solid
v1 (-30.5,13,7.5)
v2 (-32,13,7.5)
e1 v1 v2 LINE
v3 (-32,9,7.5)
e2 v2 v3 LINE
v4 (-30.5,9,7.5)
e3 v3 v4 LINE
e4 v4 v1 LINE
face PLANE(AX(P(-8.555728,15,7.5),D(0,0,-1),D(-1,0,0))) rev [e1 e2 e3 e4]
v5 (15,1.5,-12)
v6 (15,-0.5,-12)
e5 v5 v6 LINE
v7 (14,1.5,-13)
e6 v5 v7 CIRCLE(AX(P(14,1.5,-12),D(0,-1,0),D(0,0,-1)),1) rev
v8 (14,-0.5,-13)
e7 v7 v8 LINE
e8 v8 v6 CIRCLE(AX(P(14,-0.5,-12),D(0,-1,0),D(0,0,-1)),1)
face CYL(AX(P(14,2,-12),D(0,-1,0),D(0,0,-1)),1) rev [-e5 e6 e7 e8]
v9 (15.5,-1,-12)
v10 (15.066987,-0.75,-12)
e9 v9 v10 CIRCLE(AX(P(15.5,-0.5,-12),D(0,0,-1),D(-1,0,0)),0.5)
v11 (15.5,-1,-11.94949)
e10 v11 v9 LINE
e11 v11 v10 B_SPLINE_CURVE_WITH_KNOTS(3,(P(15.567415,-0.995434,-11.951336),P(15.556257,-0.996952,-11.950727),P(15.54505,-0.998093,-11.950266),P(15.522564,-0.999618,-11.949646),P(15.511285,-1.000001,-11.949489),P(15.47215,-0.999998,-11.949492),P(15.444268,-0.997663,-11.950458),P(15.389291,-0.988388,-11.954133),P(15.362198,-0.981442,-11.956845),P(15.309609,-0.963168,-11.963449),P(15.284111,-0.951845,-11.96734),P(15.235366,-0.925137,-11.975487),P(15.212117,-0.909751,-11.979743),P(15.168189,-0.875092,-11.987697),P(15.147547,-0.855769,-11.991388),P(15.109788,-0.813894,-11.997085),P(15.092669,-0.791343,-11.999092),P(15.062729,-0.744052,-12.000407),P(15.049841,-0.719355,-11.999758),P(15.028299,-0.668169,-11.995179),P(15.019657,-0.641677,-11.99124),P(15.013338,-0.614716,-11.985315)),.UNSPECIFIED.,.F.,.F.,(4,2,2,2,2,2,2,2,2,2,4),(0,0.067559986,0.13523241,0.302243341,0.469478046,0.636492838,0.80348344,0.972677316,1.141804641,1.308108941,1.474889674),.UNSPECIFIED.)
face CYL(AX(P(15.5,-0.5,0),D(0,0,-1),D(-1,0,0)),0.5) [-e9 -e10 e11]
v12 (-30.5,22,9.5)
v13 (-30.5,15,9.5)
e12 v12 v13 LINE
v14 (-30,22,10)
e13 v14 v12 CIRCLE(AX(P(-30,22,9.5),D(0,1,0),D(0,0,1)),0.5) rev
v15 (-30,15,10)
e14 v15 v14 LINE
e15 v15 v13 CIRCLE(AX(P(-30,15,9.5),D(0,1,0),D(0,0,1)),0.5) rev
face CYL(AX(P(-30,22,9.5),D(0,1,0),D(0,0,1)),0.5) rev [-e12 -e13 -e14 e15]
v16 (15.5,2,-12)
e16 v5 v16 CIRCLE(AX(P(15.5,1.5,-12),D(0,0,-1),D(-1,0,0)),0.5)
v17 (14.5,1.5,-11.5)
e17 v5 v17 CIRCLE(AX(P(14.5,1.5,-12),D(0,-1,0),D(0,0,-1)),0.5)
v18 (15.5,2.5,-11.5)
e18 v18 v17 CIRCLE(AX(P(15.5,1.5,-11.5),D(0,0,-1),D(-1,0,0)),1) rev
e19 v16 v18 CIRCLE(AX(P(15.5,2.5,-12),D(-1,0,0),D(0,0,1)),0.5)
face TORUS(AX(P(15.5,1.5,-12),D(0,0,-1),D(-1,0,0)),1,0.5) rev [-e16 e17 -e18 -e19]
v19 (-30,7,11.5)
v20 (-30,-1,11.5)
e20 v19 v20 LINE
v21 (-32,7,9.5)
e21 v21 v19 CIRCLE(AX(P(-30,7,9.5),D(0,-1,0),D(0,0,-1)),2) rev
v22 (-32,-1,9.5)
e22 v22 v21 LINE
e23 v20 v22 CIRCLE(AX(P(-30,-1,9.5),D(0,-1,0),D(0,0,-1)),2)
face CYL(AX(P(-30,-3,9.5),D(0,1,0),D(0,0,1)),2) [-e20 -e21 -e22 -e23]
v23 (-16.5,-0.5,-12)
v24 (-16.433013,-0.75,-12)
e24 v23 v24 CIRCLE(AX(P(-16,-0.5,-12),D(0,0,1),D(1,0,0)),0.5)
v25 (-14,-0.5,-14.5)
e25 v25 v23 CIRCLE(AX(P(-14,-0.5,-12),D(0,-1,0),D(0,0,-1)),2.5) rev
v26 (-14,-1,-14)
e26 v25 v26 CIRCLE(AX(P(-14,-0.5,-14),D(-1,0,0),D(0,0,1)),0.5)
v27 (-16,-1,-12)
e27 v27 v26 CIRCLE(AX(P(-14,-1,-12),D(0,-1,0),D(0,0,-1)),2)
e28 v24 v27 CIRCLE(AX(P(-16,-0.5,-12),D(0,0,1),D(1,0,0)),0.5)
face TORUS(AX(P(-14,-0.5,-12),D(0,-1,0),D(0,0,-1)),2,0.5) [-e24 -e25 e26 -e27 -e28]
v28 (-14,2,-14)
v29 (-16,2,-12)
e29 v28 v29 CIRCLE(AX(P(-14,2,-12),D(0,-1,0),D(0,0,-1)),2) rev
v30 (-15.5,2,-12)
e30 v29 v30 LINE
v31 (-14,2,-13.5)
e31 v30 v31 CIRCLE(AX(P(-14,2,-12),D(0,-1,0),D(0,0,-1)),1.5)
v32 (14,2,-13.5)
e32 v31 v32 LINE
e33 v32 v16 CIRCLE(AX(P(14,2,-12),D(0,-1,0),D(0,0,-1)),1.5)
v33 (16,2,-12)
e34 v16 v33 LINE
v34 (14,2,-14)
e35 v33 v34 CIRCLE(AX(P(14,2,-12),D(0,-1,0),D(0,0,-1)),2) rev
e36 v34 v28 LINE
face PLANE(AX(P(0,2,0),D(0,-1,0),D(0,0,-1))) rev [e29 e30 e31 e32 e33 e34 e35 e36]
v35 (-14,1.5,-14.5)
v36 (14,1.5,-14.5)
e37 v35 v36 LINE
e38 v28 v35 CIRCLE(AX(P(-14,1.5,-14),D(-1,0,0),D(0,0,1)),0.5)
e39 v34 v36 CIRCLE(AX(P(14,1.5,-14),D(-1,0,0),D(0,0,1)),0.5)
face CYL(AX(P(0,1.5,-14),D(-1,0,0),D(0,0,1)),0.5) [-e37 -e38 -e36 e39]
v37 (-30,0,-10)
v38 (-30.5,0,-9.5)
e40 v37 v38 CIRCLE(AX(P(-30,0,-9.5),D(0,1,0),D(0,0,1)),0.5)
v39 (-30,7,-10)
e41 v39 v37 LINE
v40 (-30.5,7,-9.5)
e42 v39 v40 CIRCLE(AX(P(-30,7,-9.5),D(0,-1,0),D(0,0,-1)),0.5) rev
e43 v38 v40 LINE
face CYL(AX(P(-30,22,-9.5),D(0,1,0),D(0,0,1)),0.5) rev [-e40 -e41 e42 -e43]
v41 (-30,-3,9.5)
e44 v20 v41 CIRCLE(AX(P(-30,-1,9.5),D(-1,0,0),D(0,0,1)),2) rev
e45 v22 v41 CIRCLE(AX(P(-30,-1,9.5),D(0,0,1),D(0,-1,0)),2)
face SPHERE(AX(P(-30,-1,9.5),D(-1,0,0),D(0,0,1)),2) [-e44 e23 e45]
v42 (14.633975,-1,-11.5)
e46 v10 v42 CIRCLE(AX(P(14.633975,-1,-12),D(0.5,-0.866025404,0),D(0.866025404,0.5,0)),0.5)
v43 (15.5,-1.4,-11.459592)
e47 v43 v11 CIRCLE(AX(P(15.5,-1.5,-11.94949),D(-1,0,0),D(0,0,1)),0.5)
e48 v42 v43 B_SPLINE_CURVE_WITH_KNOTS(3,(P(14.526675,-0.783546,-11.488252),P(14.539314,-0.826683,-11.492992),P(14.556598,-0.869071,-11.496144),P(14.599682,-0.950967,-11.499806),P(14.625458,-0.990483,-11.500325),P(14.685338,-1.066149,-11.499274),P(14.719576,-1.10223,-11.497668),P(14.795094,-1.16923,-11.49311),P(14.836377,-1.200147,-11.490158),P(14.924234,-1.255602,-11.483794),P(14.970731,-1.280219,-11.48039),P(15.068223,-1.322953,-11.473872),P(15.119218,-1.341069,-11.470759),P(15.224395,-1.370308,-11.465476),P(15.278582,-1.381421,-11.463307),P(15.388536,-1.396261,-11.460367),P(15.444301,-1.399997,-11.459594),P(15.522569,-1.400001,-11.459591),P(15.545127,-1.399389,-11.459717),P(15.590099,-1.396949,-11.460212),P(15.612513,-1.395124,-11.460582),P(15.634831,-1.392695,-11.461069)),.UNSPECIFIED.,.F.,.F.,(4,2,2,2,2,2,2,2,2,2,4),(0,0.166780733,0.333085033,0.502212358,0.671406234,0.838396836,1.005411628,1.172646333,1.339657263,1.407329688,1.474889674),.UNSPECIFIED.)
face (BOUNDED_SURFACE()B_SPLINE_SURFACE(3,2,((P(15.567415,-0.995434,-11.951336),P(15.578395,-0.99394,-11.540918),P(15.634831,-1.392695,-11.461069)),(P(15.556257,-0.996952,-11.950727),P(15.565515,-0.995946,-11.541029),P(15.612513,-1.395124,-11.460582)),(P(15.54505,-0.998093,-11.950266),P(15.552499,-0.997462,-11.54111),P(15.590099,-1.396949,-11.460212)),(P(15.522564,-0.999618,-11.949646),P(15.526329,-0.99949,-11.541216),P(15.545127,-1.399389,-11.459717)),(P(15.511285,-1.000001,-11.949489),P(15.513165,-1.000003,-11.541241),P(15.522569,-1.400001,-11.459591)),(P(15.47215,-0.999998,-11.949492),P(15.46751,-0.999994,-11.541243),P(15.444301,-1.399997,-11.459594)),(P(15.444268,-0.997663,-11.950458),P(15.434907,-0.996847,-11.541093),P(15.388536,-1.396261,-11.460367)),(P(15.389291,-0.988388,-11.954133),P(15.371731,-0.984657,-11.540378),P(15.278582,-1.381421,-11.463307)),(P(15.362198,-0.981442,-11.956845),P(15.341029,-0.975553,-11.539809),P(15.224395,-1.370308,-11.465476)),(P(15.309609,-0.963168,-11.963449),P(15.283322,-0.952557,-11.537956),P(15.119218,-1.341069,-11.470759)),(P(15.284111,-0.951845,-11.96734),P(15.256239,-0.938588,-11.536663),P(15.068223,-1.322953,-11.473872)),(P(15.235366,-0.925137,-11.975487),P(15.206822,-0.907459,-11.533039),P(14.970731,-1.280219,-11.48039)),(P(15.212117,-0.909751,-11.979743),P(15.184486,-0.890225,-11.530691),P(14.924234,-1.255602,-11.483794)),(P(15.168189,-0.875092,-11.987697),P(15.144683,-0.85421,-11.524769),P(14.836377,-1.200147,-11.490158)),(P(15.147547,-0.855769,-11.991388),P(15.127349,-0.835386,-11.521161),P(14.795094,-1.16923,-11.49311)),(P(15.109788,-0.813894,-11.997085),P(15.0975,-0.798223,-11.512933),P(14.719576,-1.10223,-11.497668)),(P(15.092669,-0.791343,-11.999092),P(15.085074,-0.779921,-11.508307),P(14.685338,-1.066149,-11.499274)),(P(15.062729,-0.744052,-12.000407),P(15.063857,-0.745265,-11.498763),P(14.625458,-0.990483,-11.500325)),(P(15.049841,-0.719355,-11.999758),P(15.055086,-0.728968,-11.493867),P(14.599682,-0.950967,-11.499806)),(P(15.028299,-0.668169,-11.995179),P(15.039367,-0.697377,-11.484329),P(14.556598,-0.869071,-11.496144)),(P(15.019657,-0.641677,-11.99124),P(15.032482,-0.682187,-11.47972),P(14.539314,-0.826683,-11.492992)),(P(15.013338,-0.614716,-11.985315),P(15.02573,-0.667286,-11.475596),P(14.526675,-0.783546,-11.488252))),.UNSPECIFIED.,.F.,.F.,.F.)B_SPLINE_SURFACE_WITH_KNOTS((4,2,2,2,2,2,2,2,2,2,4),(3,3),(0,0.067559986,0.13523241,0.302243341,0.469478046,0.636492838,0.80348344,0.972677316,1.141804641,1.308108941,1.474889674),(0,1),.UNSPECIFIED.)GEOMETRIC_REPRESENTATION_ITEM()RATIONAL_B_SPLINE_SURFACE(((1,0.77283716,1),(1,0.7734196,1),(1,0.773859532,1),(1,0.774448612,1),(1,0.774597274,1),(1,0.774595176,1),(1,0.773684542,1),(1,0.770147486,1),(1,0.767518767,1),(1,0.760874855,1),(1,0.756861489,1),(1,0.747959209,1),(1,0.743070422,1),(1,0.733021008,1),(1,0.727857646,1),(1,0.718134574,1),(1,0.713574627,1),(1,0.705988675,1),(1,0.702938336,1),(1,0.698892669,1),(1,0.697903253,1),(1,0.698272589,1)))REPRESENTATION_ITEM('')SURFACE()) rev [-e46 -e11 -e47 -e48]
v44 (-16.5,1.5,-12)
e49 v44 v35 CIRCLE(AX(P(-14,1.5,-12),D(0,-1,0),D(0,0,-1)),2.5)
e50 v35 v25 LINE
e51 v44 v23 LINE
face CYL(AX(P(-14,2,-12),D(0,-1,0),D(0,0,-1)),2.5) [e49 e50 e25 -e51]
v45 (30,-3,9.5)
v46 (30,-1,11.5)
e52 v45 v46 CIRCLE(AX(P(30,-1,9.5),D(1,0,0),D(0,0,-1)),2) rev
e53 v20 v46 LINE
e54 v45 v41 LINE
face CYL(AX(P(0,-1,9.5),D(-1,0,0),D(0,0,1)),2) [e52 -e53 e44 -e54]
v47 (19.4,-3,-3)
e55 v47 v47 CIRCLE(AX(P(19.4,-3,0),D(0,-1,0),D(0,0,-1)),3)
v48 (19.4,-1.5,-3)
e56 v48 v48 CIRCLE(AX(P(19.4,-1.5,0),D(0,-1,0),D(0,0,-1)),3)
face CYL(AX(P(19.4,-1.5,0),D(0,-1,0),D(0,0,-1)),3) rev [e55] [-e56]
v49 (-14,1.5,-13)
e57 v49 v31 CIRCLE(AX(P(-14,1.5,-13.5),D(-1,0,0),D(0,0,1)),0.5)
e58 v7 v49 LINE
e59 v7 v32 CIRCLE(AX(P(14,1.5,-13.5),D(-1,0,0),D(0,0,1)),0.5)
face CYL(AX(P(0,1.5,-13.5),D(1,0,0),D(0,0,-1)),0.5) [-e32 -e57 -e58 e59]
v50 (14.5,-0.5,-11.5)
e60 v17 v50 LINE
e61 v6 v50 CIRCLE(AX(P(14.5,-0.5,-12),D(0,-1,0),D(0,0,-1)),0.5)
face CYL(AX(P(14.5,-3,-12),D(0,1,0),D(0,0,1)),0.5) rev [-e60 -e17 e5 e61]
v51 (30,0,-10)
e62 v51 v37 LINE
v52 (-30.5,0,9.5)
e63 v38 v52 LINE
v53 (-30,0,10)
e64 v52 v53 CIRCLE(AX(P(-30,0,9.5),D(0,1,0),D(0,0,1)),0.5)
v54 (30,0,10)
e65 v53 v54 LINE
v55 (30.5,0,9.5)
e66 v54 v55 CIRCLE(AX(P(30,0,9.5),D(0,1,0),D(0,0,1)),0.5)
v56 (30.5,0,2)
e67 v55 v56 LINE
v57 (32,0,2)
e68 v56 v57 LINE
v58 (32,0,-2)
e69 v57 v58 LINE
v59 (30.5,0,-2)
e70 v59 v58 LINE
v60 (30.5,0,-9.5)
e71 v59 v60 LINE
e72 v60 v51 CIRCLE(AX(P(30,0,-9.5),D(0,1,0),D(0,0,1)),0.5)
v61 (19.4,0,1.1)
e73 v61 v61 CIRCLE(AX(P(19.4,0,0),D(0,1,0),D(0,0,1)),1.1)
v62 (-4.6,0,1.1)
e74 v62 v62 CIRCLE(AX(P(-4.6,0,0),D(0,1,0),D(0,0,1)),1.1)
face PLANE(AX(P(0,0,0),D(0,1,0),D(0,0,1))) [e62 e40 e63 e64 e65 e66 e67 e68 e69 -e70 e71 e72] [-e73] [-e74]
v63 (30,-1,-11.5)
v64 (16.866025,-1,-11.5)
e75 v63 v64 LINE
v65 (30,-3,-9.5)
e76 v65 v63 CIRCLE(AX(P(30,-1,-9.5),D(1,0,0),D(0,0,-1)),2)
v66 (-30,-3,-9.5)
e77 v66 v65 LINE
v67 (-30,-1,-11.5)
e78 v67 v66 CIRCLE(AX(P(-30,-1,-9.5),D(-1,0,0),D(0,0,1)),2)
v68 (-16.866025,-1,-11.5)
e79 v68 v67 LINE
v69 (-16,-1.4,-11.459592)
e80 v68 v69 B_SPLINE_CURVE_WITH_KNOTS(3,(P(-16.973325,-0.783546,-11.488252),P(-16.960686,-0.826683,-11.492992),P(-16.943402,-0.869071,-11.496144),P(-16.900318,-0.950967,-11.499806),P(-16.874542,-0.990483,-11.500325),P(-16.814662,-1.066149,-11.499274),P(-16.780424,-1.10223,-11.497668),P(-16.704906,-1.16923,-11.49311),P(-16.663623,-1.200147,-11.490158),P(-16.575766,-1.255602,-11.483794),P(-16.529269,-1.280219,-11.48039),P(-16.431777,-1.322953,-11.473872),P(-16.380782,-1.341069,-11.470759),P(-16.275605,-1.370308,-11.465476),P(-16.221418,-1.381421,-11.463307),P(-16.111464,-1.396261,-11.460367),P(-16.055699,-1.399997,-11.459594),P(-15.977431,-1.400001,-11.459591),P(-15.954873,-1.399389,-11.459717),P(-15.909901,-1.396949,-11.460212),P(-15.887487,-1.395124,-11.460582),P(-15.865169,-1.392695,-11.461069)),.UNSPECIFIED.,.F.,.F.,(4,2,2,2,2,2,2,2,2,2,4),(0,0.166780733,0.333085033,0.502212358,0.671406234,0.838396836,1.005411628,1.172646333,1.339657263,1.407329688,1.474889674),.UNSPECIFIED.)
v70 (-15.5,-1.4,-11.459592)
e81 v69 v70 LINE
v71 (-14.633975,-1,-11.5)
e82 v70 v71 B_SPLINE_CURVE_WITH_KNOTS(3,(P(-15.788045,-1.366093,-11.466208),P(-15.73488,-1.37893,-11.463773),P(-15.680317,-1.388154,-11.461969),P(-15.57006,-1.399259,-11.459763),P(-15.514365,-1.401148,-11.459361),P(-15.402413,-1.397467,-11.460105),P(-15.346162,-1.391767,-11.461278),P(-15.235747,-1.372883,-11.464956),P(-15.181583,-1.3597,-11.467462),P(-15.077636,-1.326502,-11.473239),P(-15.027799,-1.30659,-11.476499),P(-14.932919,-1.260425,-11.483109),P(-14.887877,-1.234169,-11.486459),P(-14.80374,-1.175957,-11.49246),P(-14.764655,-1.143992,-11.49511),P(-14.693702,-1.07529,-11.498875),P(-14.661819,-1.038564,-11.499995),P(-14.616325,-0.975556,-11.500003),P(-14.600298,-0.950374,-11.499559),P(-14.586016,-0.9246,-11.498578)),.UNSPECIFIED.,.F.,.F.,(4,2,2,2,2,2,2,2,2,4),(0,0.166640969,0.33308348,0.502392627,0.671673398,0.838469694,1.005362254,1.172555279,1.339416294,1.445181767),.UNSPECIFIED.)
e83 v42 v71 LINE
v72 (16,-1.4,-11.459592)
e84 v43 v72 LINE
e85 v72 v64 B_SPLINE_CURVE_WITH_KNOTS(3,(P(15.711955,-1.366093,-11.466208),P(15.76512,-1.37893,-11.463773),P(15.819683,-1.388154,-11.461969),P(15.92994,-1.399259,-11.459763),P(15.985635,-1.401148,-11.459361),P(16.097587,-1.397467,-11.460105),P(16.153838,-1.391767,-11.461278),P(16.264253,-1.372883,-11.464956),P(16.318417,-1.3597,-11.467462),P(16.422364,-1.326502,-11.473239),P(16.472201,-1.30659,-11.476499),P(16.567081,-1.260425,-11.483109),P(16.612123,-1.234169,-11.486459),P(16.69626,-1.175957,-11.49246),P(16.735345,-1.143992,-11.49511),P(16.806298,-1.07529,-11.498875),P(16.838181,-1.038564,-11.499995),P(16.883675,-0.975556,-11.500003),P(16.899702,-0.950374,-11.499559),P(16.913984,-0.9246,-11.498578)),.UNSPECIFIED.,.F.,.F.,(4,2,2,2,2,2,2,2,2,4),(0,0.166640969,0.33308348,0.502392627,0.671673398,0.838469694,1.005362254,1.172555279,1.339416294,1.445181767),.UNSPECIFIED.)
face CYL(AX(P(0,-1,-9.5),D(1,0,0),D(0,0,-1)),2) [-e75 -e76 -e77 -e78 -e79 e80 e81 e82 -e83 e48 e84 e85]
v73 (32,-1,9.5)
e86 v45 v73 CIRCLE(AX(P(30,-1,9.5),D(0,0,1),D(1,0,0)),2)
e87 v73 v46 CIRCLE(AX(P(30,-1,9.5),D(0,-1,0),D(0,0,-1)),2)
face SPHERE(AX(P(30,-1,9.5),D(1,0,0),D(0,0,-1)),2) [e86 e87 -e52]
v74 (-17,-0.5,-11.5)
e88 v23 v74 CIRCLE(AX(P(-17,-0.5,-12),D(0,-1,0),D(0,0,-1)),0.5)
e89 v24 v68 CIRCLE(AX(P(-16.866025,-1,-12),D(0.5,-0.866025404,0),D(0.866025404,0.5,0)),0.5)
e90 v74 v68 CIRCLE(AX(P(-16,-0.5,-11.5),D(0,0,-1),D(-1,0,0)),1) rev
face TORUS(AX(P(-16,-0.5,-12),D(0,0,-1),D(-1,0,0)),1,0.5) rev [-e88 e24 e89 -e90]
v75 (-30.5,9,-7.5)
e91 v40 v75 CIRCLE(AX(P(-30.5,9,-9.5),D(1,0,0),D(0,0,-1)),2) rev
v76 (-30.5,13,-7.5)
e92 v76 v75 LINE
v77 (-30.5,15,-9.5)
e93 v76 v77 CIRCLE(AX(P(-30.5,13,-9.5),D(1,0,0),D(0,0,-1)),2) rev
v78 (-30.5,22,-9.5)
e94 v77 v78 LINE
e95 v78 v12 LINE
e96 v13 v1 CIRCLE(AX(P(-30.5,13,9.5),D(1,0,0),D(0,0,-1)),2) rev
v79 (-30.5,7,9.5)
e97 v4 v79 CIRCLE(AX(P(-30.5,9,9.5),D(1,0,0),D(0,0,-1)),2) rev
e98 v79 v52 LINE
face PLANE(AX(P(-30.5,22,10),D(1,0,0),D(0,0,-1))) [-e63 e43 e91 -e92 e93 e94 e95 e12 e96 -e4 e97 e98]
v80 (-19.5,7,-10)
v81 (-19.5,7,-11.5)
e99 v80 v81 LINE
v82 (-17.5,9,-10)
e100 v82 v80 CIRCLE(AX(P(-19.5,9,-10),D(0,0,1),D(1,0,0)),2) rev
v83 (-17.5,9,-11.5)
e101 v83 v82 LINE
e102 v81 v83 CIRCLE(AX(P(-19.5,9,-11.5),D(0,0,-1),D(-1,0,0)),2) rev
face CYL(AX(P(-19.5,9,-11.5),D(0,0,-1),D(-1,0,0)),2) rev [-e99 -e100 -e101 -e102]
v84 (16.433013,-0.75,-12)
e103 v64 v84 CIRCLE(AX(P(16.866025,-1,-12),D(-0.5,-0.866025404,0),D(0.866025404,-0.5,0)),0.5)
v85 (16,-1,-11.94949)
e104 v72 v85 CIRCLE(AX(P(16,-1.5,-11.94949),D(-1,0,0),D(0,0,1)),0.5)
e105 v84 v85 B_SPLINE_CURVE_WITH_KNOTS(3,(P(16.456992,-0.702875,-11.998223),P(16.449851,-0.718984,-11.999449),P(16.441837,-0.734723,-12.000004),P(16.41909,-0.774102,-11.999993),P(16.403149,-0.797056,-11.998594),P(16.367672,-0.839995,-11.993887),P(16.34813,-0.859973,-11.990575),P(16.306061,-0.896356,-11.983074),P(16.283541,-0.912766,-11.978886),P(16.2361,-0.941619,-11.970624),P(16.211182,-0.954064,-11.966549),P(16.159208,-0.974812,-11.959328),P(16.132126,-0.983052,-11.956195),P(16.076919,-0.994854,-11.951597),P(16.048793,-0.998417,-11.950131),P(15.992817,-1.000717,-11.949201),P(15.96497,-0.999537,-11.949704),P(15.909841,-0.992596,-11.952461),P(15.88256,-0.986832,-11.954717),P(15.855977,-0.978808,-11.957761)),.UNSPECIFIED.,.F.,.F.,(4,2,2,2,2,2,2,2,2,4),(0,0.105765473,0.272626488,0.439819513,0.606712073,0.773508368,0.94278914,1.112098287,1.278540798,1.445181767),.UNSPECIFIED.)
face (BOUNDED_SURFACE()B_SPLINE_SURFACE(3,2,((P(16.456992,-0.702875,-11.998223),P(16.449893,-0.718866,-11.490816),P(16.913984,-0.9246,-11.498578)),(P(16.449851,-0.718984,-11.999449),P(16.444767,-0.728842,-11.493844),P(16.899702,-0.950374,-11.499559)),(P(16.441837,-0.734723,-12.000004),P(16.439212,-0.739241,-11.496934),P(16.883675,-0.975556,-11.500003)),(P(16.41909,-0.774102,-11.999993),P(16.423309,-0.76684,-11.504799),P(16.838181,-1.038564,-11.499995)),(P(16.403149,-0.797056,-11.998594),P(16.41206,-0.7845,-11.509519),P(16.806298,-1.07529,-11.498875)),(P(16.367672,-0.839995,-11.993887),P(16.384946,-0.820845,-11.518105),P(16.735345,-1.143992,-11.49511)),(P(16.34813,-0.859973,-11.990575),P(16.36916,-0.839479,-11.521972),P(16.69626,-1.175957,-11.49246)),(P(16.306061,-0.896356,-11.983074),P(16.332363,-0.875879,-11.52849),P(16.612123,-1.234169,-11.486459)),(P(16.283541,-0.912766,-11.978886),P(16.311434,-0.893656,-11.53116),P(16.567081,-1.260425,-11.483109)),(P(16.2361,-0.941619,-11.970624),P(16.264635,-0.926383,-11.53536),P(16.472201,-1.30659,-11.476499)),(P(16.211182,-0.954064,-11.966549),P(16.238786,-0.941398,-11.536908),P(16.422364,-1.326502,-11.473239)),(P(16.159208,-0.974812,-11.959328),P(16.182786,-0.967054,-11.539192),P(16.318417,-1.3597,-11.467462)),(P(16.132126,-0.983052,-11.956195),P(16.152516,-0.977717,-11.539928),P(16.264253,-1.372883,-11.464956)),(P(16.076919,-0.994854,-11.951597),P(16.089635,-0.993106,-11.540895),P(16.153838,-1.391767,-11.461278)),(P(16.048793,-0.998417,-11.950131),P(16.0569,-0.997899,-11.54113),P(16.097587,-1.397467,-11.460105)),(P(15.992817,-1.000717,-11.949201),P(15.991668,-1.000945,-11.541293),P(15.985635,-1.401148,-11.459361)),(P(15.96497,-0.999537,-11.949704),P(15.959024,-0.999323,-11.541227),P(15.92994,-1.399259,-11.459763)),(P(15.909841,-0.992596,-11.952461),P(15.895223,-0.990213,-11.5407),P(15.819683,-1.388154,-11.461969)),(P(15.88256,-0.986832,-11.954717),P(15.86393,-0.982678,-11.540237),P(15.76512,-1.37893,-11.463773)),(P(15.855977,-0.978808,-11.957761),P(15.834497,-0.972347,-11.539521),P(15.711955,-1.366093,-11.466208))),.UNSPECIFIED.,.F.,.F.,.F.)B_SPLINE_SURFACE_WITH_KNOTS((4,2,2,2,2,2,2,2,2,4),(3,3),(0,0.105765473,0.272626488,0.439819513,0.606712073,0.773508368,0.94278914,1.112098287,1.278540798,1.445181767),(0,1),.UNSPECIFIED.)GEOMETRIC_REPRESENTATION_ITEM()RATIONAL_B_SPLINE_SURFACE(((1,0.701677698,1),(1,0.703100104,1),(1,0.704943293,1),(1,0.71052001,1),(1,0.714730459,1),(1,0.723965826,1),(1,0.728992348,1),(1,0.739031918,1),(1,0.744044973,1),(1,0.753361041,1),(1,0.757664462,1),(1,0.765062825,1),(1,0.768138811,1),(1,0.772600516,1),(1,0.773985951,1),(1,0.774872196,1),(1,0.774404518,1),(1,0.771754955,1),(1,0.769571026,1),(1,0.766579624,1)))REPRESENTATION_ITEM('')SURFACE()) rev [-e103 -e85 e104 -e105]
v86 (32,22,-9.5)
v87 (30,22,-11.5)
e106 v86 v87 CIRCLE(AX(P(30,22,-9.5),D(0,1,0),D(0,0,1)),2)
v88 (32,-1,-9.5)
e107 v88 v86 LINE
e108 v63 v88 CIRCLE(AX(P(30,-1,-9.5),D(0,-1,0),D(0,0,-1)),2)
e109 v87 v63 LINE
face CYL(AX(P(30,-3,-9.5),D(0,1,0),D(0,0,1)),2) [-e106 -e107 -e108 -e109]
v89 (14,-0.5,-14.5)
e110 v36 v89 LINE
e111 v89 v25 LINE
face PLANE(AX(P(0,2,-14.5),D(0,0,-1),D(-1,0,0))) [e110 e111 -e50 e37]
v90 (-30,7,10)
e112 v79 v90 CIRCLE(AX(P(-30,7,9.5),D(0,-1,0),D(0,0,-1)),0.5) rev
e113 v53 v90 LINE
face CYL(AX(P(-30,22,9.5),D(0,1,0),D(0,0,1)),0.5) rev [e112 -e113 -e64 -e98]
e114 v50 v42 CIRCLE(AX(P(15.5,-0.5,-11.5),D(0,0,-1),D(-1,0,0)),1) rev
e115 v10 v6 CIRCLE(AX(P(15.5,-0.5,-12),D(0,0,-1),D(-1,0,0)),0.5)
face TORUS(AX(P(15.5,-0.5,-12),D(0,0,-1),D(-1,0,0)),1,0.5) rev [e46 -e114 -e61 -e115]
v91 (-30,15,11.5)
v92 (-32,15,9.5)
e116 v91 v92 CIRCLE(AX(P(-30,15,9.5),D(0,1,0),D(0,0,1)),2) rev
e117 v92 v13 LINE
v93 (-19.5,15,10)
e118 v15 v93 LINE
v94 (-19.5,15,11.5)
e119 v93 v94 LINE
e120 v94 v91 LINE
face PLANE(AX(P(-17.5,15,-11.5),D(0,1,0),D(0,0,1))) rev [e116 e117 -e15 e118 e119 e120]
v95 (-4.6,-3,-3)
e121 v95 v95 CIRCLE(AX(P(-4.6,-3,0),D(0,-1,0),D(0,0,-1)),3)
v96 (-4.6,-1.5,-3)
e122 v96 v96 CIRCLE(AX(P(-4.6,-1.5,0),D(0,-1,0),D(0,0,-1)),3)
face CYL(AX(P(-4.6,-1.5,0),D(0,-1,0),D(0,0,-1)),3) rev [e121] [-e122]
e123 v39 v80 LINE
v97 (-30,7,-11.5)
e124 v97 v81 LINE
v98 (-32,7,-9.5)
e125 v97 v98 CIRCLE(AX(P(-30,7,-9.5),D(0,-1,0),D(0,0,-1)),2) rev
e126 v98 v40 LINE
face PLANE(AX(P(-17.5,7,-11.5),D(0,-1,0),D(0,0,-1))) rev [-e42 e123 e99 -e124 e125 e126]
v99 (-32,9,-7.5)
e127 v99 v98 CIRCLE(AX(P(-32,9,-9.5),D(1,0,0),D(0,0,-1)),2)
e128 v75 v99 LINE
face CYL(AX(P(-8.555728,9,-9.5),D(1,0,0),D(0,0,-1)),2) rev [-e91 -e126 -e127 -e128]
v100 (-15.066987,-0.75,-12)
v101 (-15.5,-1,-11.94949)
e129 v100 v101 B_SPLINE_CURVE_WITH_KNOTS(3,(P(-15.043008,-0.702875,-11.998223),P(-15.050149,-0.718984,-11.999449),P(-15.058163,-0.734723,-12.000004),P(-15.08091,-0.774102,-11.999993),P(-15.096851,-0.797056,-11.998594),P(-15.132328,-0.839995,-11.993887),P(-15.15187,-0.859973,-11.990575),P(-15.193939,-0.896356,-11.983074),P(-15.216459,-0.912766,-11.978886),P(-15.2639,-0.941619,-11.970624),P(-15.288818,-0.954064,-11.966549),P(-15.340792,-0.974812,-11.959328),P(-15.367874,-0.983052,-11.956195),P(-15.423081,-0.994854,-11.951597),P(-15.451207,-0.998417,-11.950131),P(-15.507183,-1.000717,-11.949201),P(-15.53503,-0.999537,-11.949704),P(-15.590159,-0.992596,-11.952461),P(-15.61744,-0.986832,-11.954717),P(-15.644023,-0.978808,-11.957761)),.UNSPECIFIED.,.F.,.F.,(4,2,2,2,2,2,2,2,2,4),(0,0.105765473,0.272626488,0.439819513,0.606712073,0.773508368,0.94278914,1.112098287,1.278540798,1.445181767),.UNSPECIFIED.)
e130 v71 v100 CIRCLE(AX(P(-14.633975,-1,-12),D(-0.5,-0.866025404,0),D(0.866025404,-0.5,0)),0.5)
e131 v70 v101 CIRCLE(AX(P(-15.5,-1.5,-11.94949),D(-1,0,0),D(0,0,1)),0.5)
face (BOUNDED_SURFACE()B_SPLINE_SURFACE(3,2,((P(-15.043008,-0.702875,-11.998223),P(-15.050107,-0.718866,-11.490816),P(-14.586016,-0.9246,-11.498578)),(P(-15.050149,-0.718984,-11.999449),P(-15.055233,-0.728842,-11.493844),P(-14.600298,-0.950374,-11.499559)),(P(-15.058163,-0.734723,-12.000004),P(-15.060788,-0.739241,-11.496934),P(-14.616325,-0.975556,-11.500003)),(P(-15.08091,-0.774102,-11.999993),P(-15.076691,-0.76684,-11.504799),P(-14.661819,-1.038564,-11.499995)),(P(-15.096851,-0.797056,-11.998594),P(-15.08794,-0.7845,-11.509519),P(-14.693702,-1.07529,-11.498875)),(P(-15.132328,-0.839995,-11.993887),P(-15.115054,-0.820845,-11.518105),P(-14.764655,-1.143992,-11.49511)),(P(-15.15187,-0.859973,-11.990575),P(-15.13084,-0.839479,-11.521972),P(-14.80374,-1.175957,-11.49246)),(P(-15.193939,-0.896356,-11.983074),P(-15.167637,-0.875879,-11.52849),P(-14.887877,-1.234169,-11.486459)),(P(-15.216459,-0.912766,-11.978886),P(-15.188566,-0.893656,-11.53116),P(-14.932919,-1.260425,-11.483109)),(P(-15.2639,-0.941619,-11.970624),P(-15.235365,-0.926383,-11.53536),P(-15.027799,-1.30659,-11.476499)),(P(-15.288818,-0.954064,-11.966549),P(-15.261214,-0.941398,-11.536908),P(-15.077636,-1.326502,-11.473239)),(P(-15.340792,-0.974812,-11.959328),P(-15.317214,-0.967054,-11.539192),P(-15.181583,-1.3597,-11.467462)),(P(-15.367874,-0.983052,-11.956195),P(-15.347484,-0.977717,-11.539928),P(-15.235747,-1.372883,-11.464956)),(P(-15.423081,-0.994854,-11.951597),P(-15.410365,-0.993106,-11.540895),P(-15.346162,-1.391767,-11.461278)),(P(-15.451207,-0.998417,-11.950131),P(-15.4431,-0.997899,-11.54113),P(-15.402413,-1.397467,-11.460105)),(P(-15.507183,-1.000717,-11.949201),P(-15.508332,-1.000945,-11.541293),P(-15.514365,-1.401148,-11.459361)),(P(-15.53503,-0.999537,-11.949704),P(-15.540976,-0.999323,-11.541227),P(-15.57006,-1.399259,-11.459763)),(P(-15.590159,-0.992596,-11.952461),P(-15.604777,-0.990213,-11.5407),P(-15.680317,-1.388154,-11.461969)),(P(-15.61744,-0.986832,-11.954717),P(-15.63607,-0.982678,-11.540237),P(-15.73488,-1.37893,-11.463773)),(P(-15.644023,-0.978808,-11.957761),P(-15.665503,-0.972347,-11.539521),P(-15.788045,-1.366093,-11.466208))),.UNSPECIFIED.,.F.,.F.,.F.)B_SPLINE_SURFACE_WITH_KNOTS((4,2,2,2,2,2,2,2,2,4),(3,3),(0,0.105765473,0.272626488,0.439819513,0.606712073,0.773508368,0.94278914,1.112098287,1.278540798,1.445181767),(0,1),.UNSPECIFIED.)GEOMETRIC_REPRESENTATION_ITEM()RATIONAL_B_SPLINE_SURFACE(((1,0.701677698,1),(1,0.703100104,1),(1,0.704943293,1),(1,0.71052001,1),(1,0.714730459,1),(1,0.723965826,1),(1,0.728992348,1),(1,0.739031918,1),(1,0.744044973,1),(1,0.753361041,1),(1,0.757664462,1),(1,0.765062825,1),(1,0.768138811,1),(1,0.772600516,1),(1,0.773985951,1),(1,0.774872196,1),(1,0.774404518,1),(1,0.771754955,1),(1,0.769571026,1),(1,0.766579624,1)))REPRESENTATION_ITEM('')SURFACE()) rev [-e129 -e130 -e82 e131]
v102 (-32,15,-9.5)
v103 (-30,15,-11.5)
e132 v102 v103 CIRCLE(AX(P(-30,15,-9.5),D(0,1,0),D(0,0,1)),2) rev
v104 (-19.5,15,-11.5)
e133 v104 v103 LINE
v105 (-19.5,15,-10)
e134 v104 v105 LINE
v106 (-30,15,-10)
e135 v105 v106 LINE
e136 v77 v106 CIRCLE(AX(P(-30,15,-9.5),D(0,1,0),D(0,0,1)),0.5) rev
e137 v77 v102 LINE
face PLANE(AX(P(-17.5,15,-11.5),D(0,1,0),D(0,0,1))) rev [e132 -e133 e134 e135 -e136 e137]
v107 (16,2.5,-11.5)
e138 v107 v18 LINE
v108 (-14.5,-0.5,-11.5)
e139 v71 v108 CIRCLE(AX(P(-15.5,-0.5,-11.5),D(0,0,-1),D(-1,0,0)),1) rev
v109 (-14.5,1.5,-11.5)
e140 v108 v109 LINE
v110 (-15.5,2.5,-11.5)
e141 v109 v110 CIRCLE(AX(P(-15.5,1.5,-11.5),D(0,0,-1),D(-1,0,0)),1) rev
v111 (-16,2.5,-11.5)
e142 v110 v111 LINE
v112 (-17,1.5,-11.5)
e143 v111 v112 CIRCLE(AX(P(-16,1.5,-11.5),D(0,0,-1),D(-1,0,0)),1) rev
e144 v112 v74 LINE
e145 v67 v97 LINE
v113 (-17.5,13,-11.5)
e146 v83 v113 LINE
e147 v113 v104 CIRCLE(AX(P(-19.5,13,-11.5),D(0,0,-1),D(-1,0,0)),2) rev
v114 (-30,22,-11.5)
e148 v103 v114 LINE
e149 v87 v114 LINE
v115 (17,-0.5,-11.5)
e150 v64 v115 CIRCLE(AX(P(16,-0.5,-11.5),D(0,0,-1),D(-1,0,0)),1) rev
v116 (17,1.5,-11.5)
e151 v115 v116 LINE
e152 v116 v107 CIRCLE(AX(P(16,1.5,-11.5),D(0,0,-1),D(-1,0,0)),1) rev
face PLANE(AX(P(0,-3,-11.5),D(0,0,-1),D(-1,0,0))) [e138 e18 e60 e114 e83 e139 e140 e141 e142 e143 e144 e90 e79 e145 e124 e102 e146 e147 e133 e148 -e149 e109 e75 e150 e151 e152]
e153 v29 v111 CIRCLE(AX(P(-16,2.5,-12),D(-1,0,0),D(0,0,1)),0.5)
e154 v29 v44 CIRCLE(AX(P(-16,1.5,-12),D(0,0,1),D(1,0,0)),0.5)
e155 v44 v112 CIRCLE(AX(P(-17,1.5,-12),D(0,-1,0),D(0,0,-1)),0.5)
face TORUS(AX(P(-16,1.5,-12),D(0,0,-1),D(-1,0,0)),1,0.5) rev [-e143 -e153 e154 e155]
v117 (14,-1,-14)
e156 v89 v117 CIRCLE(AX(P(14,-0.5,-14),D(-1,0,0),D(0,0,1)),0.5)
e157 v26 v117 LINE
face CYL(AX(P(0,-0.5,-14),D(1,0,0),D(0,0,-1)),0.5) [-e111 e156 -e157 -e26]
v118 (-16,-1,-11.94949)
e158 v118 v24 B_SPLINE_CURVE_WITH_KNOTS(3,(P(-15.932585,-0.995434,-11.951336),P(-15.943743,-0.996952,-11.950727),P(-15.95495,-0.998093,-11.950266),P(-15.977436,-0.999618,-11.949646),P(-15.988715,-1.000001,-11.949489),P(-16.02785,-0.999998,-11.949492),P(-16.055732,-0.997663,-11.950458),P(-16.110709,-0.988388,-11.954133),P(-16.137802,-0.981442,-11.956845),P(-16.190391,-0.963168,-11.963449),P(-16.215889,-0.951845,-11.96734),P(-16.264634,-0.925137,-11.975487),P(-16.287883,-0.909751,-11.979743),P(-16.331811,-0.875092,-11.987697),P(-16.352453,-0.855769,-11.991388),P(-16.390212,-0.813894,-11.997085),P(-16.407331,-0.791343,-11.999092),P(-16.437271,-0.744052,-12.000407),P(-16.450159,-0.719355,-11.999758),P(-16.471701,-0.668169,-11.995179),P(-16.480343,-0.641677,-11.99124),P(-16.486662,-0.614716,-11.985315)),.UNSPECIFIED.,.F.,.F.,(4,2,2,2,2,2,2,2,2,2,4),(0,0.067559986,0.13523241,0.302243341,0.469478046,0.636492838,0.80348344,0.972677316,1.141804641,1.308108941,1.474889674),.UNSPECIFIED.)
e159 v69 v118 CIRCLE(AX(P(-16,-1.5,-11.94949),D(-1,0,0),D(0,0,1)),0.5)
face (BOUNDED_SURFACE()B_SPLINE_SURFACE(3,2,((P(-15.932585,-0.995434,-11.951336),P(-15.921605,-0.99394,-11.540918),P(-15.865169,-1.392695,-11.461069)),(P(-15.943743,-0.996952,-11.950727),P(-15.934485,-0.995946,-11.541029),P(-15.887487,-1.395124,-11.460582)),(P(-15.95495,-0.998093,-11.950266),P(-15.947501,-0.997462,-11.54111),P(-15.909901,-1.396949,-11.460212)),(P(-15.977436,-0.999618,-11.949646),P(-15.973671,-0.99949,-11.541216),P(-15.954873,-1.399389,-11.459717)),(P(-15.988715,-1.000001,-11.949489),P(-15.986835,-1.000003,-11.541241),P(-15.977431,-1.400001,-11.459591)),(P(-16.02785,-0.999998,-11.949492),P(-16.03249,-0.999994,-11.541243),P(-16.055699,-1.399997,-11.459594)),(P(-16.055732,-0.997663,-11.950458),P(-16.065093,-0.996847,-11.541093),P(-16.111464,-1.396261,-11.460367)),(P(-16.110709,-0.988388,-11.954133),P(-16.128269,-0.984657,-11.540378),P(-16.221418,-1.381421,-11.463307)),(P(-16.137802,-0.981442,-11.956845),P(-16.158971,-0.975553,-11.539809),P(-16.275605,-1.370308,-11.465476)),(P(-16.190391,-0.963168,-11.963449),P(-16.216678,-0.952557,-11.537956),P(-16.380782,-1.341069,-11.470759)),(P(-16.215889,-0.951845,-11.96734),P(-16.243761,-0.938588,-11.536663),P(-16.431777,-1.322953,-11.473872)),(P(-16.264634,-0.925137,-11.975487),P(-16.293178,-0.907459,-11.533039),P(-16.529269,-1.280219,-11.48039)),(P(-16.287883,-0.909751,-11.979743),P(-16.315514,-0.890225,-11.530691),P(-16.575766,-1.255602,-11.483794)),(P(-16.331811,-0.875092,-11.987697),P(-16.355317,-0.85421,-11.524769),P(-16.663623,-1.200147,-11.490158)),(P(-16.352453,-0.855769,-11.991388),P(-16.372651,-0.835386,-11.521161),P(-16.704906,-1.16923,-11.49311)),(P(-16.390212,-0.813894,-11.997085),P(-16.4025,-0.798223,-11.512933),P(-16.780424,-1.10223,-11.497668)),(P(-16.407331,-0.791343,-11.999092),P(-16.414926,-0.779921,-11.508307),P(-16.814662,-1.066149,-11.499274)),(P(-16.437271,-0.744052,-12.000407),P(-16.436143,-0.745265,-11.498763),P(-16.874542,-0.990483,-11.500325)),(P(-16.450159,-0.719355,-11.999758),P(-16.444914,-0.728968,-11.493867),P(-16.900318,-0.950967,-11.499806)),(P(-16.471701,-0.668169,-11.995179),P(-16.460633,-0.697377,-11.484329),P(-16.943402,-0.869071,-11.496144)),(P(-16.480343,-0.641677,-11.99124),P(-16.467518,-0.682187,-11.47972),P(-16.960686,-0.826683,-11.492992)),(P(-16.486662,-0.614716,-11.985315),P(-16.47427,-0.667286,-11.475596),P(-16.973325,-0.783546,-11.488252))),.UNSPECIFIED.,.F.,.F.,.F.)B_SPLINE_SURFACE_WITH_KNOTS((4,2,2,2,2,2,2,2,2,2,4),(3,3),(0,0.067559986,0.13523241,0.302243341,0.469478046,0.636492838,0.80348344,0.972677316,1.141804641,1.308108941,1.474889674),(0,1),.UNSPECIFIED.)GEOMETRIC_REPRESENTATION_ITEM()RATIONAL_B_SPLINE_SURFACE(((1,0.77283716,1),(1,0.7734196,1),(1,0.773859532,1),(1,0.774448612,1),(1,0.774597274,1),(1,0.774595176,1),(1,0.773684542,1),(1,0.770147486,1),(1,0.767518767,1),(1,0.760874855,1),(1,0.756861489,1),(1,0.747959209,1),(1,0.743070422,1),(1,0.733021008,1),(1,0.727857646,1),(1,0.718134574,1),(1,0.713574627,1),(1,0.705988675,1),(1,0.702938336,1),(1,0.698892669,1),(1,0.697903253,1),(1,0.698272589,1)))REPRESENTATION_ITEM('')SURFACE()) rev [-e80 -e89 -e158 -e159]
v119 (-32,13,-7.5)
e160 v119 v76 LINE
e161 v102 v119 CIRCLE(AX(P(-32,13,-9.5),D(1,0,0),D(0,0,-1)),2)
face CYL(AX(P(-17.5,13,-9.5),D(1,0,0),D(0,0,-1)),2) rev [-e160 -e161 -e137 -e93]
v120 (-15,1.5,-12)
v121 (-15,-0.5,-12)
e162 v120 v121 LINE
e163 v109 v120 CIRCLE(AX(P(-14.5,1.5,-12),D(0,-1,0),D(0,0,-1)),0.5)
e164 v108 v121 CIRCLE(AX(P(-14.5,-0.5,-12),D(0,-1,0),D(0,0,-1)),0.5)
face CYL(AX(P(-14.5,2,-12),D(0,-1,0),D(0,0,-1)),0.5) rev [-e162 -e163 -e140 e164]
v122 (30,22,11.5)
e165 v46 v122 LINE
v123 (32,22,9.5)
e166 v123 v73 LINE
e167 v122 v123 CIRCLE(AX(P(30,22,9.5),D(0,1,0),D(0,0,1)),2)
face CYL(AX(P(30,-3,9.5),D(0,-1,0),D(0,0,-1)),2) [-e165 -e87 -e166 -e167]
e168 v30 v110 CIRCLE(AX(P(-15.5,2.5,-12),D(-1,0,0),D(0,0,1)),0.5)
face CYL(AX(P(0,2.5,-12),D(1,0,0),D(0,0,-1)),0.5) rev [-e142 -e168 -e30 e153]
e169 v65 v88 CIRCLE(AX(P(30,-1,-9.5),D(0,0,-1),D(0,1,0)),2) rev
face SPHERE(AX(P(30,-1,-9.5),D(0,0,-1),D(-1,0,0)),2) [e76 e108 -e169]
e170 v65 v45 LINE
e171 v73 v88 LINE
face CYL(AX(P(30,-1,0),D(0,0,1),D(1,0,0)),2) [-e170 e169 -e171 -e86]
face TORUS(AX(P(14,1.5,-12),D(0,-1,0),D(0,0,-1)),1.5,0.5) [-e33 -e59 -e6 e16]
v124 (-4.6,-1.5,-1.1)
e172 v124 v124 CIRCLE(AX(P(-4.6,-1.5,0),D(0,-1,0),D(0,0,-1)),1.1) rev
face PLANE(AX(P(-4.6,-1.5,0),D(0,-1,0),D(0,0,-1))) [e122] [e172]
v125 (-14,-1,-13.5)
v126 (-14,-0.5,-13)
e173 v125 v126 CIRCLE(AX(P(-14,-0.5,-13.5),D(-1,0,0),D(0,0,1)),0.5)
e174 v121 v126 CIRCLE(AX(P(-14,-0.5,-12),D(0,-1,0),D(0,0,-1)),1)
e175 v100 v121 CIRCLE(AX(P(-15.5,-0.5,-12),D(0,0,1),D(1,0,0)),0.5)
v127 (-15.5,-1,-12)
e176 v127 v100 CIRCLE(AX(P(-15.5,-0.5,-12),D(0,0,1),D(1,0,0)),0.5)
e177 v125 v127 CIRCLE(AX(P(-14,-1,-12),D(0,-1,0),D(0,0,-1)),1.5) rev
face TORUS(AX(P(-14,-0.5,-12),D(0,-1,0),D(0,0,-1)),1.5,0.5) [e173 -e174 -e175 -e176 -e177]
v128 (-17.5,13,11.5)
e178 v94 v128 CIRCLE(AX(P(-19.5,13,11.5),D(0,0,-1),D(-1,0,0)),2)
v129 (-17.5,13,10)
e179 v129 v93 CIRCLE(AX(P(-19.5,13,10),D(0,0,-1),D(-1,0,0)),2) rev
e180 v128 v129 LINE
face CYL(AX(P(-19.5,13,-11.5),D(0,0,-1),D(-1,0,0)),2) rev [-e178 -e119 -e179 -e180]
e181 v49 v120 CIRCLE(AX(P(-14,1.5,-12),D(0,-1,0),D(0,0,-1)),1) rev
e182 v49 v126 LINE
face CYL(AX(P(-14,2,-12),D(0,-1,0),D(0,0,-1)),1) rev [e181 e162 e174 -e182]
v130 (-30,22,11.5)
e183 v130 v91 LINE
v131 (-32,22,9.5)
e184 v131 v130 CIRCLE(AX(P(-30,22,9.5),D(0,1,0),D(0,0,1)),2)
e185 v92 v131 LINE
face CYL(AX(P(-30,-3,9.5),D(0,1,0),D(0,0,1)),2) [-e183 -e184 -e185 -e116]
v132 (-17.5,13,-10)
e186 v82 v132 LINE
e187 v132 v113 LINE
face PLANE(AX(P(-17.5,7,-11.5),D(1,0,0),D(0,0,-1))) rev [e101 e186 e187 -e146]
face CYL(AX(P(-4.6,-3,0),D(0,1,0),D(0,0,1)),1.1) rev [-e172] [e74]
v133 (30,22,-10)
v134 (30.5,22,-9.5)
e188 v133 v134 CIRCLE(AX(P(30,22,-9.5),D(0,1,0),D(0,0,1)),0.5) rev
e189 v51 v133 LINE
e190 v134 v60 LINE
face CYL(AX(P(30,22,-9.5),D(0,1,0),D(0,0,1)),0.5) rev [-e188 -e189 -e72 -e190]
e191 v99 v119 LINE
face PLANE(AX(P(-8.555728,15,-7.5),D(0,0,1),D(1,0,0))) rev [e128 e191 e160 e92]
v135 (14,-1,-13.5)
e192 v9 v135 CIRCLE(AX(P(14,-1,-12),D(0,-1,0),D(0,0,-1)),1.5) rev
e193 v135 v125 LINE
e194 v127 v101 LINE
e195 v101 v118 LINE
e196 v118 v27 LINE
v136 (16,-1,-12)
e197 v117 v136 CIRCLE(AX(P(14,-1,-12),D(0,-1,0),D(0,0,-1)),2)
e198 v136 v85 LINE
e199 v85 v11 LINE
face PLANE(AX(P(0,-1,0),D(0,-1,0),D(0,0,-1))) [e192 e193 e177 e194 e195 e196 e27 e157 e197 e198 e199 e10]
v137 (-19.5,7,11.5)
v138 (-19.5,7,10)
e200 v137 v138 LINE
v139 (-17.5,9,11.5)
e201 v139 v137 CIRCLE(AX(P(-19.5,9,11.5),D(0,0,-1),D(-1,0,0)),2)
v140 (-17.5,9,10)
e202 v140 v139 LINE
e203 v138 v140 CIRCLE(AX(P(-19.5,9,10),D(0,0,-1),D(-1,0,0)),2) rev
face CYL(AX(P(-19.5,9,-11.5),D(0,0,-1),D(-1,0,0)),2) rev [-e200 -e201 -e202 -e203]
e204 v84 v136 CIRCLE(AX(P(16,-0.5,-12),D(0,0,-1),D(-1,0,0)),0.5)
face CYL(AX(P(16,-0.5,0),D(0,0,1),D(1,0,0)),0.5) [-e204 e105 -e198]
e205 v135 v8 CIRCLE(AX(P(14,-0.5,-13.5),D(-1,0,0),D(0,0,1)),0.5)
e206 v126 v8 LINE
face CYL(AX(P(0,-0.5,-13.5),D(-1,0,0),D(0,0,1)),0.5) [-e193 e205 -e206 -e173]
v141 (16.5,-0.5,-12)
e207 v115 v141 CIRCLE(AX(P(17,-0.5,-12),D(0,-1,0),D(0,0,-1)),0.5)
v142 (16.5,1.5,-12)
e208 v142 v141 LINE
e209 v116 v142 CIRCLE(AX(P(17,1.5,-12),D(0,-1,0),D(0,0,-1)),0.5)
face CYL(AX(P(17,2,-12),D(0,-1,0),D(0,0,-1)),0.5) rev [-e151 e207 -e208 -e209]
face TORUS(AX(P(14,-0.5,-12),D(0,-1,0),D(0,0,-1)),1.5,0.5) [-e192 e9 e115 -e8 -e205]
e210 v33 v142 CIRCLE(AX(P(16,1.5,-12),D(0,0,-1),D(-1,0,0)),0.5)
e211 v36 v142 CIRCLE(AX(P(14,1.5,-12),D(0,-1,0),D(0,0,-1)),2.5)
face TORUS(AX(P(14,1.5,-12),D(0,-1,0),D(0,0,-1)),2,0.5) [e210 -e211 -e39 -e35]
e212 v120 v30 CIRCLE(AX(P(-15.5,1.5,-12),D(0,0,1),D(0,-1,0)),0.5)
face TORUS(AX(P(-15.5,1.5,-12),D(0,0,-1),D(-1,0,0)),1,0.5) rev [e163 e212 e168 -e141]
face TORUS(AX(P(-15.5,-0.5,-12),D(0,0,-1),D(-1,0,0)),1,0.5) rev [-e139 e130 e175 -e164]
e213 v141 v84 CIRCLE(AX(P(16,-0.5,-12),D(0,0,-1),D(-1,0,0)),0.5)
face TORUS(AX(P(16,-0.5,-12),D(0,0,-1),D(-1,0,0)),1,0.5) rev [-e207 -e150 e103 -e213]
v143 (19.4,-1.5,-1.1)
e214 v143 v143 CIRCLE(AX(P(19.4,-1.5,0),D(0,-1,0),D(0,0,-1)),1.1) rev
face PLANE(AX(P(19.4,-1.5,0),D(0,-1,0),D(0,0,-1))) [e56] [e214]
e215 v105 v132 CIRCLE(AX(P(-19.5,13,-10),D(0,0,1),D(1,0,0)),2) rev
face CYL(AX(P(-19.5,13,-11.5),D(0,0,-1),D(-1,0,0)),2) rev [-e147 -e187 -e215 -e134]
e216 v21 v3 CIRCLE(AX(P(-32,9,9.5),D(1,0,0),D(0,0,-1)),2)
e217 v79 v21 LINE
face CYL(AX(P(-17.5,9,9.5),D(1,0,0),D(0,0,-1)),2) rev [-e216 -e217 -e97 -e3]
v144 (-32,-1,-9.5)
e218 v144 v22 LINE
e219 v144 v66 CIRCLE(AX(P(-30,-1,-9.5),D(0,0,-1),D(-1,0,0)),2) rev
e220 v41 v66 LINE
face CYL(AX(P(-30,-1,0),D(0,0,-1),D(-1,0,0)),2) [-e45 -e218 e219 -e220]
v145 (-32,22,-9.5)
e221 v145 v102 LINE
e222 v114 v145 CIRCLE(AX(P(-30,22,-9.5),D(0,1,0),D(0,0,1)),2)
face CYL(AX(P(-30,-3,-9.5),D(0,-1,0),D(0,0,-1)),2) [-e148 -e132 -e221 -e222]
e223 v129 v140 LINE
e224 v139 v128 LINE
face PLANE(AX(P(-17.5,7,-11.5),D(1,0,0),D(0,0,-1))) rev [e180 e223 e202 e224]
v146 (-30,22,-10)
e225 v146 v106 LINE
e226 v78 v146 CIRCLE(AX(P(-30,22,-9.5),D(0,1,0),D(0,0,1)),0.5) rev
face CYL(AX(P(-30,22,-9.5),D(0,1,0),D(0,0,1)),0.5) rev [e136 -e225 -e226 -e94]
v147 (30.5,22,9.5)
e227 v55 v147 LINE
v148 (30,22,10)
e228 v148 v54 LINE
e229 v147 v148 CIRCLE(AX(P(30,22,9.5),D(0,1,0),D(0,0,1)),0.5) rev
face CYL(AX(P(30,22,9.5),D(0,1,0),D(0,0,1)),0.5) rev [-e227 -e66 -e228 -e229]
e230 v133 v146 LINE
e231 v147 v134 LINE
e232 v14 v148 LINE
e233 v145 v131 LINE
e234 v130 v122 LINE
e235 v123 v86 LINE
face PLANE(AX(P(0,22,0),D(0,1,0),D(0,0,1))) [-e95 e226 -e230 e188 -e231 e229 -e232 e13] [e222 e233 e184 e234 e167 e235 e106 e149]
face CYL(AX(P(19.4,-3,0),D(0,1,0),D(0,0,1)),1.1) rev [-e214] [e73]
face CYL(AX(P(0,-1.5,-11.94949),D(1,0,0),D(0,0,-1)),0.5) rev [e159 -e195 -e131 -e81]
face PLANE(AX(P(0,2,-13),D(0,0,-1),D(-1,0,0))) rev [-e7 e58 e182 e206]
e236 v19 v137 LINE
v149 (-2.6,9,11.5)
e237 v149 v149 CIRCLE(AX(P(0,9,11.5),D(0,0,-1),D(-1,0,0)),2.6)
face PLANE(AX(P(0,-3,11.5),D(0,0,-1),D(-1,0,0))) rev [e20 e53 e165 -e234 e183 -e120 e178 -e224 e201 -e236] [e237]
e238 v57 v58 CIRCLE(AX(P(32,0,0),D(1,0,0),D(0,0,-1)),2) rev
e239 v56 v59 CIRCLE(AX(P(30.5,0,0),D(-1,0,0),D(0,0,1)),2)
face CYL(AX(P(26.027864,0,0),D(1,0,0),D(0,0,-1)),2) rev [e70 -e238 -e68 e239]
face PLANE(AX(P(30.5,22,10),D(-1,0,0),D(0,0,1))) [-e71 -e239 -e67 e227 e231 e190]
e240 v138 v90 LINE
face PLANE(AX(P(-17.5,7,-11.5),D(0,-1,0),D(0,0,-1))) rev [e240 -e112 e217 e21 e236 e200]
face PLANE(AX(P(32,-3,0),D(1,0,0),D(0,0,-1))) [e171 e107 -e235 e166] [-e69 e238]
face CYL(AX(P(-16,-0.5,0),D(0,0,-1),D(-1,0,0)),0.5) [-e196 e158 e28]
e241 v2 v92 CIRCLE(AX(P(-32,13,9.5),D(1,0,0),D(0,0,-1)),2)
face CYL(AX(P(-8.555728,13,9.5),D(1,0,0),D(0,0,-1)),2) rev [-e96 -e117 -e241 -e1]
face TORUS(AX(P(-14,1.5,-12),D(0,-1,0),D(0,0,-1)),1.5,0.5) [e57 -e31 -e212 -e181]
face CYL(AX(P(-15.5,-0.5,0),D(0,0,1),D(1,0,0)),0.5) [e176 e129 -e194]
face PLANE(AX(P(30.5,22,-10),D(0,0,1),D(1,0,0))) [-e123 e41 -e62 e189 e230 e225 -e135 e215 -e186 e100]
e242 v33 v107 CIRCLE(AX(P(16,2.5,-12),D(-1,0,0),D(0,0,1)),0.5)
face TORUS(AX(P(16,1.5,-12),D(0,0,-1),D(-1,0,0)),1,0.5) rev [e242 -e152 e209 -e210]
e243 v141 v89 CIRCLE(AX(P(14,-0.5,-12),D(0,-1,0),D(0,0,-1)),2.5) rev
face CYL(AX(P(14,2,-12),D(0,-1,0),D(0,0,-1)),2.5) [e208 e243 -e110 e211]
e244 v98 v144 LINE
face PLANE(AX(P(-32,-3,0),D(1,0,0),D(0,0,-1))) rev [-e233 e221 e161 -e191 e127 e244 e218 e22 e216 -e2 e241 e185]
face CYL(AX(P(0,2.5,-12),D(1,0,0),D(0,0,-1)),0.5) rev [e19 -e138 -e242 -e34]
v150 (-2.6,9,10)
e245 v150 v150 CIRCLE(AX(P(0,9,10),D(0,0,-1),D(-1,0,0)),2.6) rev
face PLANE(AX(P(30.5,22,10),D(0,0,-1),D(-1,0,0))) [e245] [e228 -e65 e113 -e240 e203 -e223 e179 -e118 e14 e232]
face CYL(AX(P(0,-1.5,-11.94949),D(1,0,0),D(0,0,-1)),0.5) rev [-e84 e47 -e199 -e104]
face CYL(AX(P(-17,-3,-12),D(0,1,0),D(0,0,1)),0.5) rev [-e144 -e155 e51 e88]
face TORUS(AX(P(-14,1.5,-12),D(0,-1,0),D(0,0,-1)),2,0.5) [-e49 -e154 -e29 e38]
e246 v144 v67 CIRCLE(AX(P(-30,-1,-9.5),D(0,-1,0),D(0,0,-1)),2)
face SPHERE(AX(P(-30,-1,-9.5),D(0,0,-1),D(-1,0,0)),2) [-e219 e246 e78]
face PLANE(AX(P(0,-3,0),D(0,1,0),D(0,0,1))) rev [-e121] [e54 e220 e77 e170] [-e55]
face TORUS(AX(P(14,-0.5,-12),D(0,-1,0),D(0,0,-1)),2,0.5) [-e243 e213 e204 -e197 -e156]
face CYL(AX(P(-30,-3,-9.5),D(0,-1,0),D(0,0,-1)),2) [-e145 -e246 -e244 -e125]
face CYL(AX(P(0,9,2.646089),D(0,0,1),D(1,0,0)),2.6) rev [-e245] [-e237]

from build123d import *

# Parameters (mm, degrees)
SKETCH1_W               = 64
SKETCH1_H               = 23
SKETCH1_W_2             = 61
SKETCH1_H_2             = 20
BOSS_EXTRUDE1_DEPTH     = 3
SKETCH1_3_W             = 64
SKETCH1_3_H             = 23
SKETCH1_3_W_2           = 61
SKETCH1_3_H_2           = 20
BOSS_EXTRUDE2_DEPTH     = 22
FILLET1_R               = 2
FILLET2_R               = 0.5
CUT_EXTRUDE1_DEPTH      = 1.5
SKETCH3_R               = 1.1
CUT_EXTRUDE2_DEPTH      = 41.5
SKETCH4_W               = 10.5
SKETCH4_H               = 8
CUT_EXTRUDE3_DEPTH      = 46.133136386
SKETCH5_W               = 4
SKETCH5_H               = 8
CUT_EXTRUDE4_DEPTH      = 14.5
FILLET3_R               = 2
SKETCH6_R               = 3
CUT_EXTRUDE5_DEPTH      = 1.5
BOSS_EXTRUDE4_START     = -2
BOSS_EXTRUDE4_DEPTH     = 3
FILLET4_R               = 0.5
FILLET5_R               = 0.5
CUT_EXTRUDE6_DEPTH      = 47.733285782
CUT_EXTRUDE6_DEPTH_BACK = 1.5
SKETCH10_R              = 2.6


with BuildPart() as part:
    # Sketch1 → Boss-Extrude1 (new body)
    # profile 1 of 2: a face of its own
    with BuildSketch(Plane(origin=(0, 0, 0), x_dir=(1, 0, 0), z_dir=(0, 1, 0))):
        Rectangle(SKETCH1_W, SKETCH1_H)
        Rectangle(SKETCH1_W_2, SKETCH1_H_2, mode=Mode.SUBTRACT)
    # profile 2 of 2: a face of its own
    with BuildSketch(Plane(origin=(0, 0, 0), x_dir=(1, 0, 0), z_dir=(0, 1, 0))):
        Rectangle(SKETCH1_W_2, SKETCH1_H_2)
    extrude(amount=-BOSS_EXTRUDE1_DEPTH)

    # Sketch1<3> → Boss-Extrude2 (add)
    with BuildSketch(Plane(origin=(0, 0, 0), x_dir=(1, 0, 0), z_dir=(0, 1, 0))):
        Rectangle(SKETCH1_3_W, SKETCH1_3_H)
        Rectangle(SKETCH1_3_W_2, SKETCH1_3_H_2, mode=Mode.SUBTRACT)
    extrude(amount=BOSS_EXTRUDE2_DEPTH)

    # Fillet1
    fillet1_edges = [part.edges().sort_by_distance(p)[0] for p in [
        (0, -3, 11.5),
        (32, -3, 0),
        (0, -3, -11.5),
        (-32, -3, 0),
        (-32, 9.5, -11.5),
        (32, 9.5, -11.5),
        (32, 9.5, 11.5),
        (-32, 9.5, 11.5),
    ]]
    fillet(fillet1_edges, radius=FILLET1_R)

    # Fillet2
    fillet2_edges = [part.edges().sort_by_distance(p)[0] for p in [
        (-30.5, 11, 10),
        (30.5, 11, 10),
        (30.5, 11, -10),
        (-30.5, 11, -10),
    ]]
    fillet(fillet2_edges, radius=FILLET2_R)

    # Sketch2 → Cut-Extrude1 (cut)
    with BuildSketch(Plane(origin=(32, 0, 0), x_dir=(0, 0, -1), z_dir=(1, 0, 0))):
        with BuildLine():
            ThreePointArc((-2, 0), (0, 2), (2, 0))
            Line((2, 0), (-2, 0))
        make_face()
    extrude(amount=-CUT_EXTRUDE1_DEPTH, mode=Mode.SUBTRACT)

    # Sketch3 → Cut-Extrude2 (cut, through all)
    with BuildSketch(Plane(origin=(0, 0, 0), x_dir=(1, 0, 0), z_dir=(0, 1, 0))):
        with Locations(Location((19.4, 0, 0), (0, 0, 270))):
            Circle(SKETCH3_R)
        with Locations(Location((-4.6, 0, 0), (0, 0, 270))):
            Circle(SKETCH3_R)
    extrude(amount=-CUT_EXTRUDE2_DEPTH, mode=Mode.SUBTRACT)

    # Sketch4 → Cut-Extrude3 (cut, through all)
    with BuildSketch(Plane.XY.offset(11.5)):
        with Locations((-22.75, 11)):
            Rectangle(SKETCH4_W, SKETCH4_H)
    extrude(amount=-CUT_EXTRUDE3_DEPTH, mode=Mode.SUBTRACT)

    # Sketch5 → Cut-Extrude4 (cut)
    with BuildSketch(Plane.ZY.offset(32)):
        with Locations((-9.5, 11)):
            Rectangle(SKETCH5_W, SKETCH5_H)
        with Locations((9.5, 11)):
            Rectangle(SKETCH5_W, SKETCH5_H)
    extrude(amount=-CUT_EXTRUDE4_DEPTH, mode=Mode.SUBTRACT)

    # Fillet3
    fillet3_edges = [part.edges().sort_by_distance(p)[0] for p in [
        (-17.5, 7, -10.75),
        (-17.5, 15, -10.75),
        (-17.5, 7, 10.75),
        (-17.5, 15, 10.75),
        (-31.25, 7, -7.5),
        (-31.25, 15, -7.5),
        (-31.25, 15, 7.5),
        (-31.25, 7, 7.5),
    ]]
    fillet(fillet3_edges, radius=FILLET3_R)

    # Sketch6 → Cut-Extrude5 (cut)
    with BuildSketch(Plane.XZ.offset(3)):
        with Locations(Location((-4.6, 0, 0), (0, 0, 270))):
            Circle(SKETCH6_R)
        with Locations(Location((19.4, 0, 0), (0, 0, 270))):
            Circle(SKETCH6_R)
    extrude(amount=-CUT_EXTRUDE5_DEPTH, mode=Mode.SUBTRACT)

    # Sketch9 → Boss-Extrude4 (add)
    with BuildSketch(Plane.XZ.offset(3).offset(BOSS_EXTRUDE4_START)):
        with BuildLine():
            Line((-15, -11.5), (-16.5, -11.5))
            Line((-16.5, -11.5), (-16.5, -12))
            ThreePointArc((-16.5, -12), (-15.767766953, -13.767766953), (-14, -14.5))
            Line((-14, -14.5), (14, -14.5))
            ThreePointArc((14, -14.5), (15.767766953, -13.767766953), (16.5, -12))
            Line((16.5, -12), (16.5, -11.5))
            Line((16.5, -11.5), (15, -11.5))
            Line((15, -11.5), (15, -12))
            ThreePointArc((15, -12), (14.707106781, -12.707106781), (14, -13))
            Line((14, -13), (-14, -13))
            ThreePointArc((-14, -13), (-14.707106781, -12.707106781), (-15, -12))
            Line((-15, -12), (-15, -11.5))
        make_face()
    extrude(amount=-BOSS_EXTRUDE4_DEPTH)

    # Fillet4
    fillet4_edges = [part.edges().sort_by_distance(p)[0] for p in [
        (-15.767766953, -1, -13.767766953),
        (-16.5, 2, -11.75),
        (-15, -1, -11.75),
        (-14.707106781, 2, -12.707106781),
        (0, -1, -13),
        (14.707106781, -1, -12.707106781),
        (15, 2, -11.75),
        (16.5, -1, -11.75),
        (15.767766953, 2, -13.767766953),
        (0, 2, -14.5),
        (-15.767766953, 2, -13.767766953),
        (-15, 2, -11.75),
        (0, 2, -13),
        (14.707106781, 2, -12.707106781),
        (16.5, 2, -11.75),
        (0, -1, -14.5),
        (15.767766953, -1, -13.767766953),
        (15, -1, -11.75),
        (-14.707106781, -1, -12.707106781),
        (-16.5, -1, -11.75),
    ]]
    fillet(fillet4_edges, radius=FILLET4_R)

    # Fillet5
    fillet5_edges = [part.edges().sort_by_distance(p)[0] for p in [
        (16.353553391, 1.853553391, -11.5),
        (15.75, 2, -11.5),
        (15.146446609, 1.853553391, -11.5),
        (15, 0.5, -11.5),
        (15.146446609, -0.853553391, -11.5),
        (-15.75, -1, -11.5),
        (15.75, -1, -11.5),
        (16.353553391, -0.853553391, -11.5),
        (-15.146446609, 1.853553391, -11.5),
        (-15.75, 2, -11.5),
        (-16.353553391, 1.853553391, -11.5),
        (-16.5, 0.5, -11.5),
        (-16.353553391, -0.853553391, -11.5),
        (-15.146446609, -0.853553391, -11.5),
        (16.5, 0.5, -11.5),
        (-15, 0.5, -11.5),
    ]]
    fillet(fillet5_edges, radius=FILLET5_R - 0.0001)  # a hair under: the kernel refuses the full size

    # Sketch10 → Cut-Extrude6 (cut, two sides: drawn at the far end of the back side and taken through both)
    with BuildSketch(Plane.XY.offset(11.5).offset(-CUT_EXTRUDE6_DEPTH_BACK)):
        with Locations(Location((0, 9, 0), (0, 0, 180))):
            Circle(SKETCH10_R)
    extrude(amount=CUT_EXTRUDE6_DEPTH + CUT_EXTRUDE6_DEPTH_BACK, mode=Mode.SUBTRACT)


solid = part.part
